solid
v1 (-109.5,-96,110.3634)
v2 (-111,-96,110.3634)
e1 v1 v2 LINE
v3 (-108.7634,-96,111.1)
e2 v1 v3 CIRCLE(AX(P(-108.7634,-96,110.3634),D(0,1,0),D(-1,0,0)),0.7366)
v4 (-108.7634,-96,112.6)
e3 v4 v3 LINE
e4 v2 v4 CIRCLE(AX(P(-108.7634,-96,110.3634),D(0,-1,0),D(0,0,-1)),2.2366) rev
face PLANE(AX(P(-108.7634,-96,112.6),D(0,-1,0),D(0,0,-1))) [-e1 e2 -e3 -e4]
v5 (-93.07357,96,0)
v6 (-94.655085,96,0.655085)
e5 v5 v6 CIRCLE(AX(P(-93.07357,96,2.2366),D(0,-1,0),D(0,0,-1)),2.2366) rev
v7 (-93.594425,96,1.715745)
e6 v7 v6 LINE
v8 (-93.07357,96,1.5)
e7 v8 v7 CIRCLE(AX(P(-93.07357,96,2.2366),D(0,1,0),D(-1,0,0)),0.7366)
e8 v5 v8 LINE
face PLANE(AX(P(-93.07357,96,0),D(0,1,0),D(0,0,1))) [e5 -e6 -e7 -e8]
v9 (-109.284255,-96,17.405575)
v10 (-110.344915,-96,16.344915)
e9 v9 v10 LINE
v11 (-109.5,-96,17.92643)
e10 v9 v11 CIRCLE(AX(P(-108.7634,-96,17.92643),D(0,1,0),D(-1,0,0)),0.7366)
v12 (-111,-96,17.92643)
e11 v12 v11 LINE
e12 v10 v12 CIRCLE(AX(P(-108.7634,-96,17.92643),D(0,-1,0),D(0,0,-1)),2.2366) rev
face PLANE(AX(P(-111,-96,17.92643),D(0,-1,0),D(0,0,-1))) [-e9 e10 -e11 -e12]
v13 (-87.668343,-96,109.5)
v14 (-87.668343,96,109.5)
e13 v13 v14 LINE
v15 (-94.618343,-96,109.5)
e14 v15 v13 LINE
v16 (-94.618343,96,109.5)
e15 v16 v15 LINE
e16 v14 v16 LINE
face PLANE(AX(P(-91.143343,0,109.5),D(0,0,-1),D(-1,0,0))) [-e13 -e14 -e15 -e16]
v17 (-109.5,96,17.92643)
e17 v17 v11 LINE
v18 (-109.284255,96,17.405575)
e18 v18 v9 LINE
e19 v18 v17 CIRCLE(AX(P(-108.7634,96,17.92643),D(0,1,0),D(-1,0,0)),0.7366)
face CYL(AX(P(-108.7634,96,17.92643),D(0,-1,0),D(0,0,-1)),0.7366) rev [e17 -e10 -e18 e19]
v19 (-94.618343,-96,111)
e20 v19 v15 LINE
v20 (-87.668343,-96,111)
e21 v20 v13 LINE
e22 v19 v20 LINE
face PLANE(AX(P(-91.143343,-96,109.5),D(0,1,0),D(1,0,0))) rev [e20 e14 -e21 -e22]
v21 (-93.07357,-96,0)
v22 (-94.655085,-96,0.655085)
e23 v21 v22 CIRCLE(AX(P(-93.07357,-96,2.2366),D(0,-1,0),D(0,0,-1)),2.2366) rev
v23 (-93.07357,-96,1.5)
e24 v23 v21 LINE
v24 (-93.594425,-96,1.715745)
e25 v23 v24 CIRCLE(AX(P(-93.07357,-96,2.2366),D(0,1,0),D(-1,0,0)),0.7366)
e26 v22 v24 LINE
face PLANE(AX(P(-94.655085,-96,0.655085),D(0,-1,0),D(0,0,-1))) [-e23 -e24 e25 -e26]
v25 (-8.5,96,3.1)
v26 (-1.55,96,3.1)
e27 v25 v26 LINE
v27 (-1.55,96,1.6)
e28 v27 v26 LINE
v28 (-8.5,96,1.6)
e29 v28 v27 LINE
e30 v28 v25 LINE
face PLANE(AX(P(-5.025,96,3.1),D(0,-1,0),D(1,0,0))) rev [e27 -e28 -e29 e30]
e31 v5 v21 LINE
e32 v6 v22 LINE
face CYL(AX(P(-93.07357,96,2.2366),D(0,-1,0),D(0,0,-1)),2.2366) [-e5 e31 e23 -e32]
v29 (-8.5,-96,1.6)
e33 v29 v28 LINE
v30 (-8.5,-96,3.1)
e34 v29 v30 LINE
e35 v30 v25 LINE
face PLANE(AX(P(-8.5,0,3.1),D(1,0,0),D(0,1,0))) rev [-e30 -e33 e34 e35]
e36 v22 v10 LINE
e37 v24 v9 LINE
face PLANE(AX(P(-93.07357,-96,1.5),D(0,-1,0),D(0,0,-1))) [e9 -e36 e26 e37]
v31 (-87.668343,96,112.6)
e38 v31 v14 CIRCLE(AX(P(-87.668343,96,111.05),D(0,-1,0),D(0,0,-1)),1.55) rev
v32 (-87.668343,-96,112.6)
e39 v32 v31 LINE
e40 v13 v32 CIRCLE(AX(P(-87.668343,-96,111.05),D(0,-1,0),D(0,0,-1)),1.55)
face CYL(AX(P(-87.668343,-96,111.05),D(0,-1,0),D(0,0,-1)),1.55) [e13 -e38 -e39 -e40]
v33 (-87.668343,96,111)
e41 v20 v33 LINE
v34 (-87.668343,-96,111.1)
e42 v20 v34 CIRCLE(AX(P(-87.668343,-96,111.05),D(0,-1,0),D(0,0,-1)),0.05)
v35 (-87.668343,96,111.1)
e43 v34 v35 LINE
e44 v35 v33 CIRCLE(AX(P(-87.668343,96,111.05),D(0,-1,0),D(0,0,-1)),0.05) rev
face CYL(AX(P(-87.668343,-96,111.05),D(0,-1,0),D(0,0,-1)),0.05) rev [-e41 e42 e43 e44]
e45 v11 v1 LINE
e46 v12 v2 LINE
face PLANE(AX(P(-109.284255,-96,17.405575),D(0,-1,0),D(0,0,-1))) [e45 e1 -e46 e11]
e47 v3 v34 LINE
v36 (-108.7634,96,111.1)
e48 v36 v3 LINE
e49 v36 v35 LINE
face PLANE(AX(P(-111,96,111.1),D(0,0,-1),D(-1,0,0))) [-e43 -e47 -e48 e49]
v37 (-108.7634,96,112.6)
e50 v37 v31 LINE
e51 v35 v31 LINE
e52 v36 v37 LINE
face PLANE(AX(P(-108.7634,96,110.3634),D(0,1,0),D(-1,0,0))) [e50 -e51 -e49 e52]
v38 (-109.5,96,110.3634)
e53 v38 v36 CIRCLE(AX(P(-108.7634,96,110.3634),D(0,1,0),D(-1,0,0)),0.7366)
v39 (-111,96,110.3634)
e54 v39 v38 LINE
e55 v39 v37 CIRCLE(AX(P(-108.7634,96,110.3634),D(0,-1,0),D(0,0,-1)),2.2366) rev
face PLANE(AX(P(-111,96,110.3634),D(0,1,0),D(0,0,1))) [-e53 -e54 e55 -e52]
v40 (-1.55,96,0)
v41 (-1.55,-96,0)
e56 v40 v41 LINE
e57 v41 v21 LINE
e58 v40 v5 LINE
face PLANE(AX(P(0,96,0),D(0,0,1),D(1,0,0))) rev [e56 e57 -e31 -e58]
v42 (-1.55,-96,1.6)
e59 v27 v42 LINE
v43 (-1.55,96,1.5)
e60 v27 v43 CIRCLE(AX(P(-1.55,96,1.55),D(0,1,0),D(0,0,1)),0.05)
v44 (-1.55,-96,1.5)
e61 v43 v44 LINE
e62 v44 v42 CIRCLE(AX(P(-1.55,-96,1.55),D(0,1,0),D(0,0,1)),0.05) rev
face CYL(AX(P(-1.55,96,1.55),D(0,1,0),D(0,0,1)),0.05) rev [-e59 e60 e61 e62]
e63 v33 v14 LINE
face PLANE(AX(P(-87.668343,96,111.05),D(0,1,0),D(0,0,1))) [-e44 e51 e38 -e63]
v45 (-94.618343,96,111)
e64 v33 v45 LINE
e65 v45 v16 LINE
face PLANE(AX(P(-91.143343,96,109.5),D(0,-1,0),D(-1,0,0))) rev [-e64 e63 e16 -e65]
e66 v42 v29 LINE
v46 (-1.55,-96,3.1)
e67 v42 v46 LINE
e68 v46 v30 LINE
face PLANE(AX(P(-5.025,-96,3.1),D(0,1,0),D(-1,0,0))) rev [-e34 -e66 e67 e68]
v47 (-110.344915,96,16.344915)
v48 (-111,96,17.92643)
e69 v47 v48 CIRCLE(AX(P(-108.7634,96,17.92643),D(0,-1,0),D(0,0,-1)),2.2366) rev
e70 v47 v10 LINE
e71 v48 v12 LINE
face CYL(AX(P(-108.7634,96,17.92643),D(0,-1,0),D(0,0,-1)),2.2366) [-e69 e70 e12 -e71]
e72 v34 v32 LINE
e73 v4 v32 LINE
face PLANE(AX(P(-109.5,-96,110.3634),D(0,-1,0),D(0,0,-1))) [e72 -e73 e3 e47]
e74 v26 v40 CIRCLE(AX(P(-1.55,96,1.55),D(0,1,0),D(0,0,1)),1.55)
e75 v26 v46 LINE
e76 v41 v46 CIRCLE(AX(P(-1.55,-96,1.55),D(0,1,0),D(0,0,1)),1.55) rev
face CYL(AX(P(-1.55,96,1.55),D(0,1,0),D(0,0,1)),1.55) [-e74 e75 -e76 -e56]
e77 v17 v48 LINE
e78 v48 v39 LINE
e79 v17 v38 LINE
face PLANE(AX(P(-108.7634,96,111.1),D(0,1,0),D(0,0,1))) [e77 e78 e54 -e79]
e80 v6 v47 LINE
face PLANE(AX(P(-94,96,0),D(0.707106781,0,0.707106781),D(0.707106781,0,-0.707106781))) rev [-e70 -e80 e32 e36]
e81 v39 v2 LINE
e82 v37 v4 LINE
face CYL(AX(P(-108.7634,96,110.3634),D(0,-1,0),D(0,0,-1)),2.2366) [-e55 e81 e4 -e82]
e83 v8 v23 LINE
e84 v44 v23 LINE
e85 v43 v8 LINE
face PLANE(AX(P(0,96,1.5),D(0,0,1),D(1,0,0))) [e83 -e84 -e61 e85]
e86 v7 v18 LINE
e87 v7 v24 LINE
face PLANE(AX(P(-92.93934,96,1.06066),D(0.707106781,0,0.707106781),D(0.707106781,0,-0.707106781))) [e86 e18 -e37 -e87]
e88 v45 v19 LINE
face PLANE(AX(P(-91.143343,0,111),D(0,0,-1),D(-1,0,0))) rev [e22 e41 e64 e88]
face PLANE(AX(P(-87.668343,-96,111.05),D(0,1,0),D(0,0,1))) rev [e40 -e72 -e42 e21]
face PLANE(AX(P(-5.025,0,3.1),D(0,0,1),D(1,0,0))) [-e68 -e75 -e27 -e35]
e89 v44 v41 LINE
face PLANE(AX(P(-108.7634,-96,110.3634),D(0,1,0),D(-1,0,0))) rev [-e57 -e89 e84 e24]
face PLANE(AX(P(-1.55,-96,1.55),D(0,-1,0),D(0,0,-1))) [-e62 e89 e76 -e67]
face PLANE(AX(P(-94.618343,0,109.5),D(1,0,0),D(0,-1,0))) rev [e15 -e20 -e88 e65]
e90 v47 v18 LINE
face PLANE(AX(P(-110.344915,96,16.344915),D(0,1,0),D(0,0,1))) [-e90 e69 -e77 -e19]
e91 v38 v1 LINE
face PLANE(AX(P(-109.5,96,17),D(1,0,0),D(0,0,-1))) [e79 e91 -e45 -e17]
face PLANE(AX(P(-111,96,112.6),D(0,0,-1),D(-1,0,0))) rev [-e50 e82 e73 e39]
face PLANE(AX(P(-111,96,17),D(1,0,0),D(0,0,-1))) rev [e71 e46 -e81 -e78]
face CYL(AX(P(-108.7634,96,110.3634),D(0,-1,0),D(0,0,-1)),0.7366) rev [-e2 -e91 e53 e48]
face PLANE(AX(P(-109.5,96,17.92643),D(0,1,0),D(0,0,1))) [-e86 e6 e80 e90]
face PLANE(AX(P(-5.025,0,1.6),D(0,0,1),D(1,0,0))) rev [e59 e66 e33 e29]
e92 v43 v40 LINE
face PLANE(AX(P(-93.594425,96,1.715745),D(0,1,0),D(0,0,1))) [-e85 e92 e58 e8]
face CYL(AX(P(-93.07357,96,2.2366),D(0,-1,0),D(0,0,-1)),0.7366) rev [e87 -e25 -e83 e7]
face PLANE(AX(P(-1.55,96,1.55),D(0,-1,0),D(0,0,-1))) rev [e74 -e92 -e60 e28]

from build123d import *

# Parameters (mm, degrees)
BASE_FLANGE1_DEPTH = 96
HEM1_START         = -96
HEM1_DEPTH         = 192
HEM1_2_DEPTH       = 192


# Read off the part's stored shape, not the designer's step: Hem1
# Sheet-metal steps are written as plain solids
with BuildPart() as part:
    # Sketch1 → Base-Flange1 (new, symmetric)
    with BuildSketch(Plane(origin=(0, 0, 0), x_dir=(-1, 0, 0), z_dir=(0, 1, 0))):
        with BuildLine():
            Line((0, 0), (93.073569946, 0))
            ThreePointArc((93.073569946, 0), (93.929479711, 0.170251038), (94.655084973, 0.655084973))
            Line((94.655084973, 0.655084973), (110.344915027, 16.344915027))
            ThreePointArc((110.344915027, 16.344915027), (110.829748962, 17.070520289), (111, 17.926430054))
            Line((111, 17.926430054), (111, 110.3634))
            ThreePointArc((111, 110.3634), (110.344915027, 111.944915027), (108.7634, 112.6))
            Line((108.7634, 112.6), (86.118343195, 112.6))
            Line((86.118343195, 112.6), (86.118343195, 111.1))
            Line((86.118343195, 111.1), (108.7634, 111.1))
            ThreePointArc((108.7634, 111.1), (109.284254855, 110.884254855), (109.5, 110.3634))
            Line((109.5, 110.3634), (109.5, 17.926430054))
            ThreePointArc((109.5, 17.926430054), (109.443929664, 17.644545437), (109.284254855, 17.405575199))
            Line((109.284254855, 17.405575199), (93.594424801, 1.715745145))
            ThreePointArc((93.594424801, 1.715745145), (93.355454563, 1.556070336), (93.073569946, 1.5))
            Line((93.073569946, 1.5), (0, 1.5))
            Line((0, 1.5), (0, 0))
        make_face()
    extrude(amount=BASE_FLANGE1_DEPTH, both=True)

    # Hem1 outline → Hem1 (cut)
    with BuildSketch(Plane(origin=(0, 0, 0), x_dir=(1, 0, 0), z_dir=(0, 1, 0)).offset(HEM1_START)):
        with BuildLine():
            Line((-86.118343195, -111.1), (-86.119149857, -111.1))
            ThreePointArc((-86.119149857, -111.1), (-86.590150262, -112.163552873), (-87.668343195, -112.6))
            Line((-87.668343195, -112.6), (-86.118343195, -112.6))
            Line((-86.118343195, -112.6), (-86.118343195, -111.1))
        make_face()
        with BuildLine():
            ThreePointArc((-1.55, 0), (-0.471807067, -0.436447127), (-0.000806662, -1.5))
            Line((-0.000806662, -1.5), (0, -1.5))
            Line((0, -1.5), (0, 0))
            Line((0, 0), (-1.55, 0))
        make_face()
    extrude(amount=HEM1_DEPTH, mode=Mode.SUBTRACT)

    # Hem1 2 outline → Hem1 2 (add)
    with BuildSketch(Plane(origin=(0, 0, 0), x_dir=(1, 0, 0), z_dir=(0, 1, 0)).offset(HEM1_START)):
        with BuildLine():
            Line((-94.618343195, -109.5), (-94.618343195, -111))
            Line((-94.618343195, -111), (-87.668343195, -111))
            ThreePointArc((-87.668343195, -111), (-87.618343195, -111.05), (-87.668343195, -111.1))
            Line((-87.668343195, -111.1), (-86.119149857, -111.1))
            ThreePointArc((-86.119149857, -111.1), (-86.554790322, -109.971807067), (-87.668343195, -109.5))
            Line((-87.668343195, -109.5), (-94.618343195, -109.5))
        make_face()
        with BuildLine():
            Line((-8.5, -1.6), (-8.5, -3.1))
            Line((-8.5, -3.1), (-1.55, -3.1))
            ThreePointArc((-1.55, -3.1), (-0.436447127, -2.628192933), (-0.000806662, -1.5))
            Line((-0.000806662, -1.5), (-1.55, -1.5))
            ThreePointArc((-1.55, -1.5), (-1.5, -1.55), (-1.55, -1.6))
            Line((-1.55, -1.6), (-8.5, -1.6))
        make_face()
    extrude(amount=HEM1_2_DEPTH)


solid = part.part
